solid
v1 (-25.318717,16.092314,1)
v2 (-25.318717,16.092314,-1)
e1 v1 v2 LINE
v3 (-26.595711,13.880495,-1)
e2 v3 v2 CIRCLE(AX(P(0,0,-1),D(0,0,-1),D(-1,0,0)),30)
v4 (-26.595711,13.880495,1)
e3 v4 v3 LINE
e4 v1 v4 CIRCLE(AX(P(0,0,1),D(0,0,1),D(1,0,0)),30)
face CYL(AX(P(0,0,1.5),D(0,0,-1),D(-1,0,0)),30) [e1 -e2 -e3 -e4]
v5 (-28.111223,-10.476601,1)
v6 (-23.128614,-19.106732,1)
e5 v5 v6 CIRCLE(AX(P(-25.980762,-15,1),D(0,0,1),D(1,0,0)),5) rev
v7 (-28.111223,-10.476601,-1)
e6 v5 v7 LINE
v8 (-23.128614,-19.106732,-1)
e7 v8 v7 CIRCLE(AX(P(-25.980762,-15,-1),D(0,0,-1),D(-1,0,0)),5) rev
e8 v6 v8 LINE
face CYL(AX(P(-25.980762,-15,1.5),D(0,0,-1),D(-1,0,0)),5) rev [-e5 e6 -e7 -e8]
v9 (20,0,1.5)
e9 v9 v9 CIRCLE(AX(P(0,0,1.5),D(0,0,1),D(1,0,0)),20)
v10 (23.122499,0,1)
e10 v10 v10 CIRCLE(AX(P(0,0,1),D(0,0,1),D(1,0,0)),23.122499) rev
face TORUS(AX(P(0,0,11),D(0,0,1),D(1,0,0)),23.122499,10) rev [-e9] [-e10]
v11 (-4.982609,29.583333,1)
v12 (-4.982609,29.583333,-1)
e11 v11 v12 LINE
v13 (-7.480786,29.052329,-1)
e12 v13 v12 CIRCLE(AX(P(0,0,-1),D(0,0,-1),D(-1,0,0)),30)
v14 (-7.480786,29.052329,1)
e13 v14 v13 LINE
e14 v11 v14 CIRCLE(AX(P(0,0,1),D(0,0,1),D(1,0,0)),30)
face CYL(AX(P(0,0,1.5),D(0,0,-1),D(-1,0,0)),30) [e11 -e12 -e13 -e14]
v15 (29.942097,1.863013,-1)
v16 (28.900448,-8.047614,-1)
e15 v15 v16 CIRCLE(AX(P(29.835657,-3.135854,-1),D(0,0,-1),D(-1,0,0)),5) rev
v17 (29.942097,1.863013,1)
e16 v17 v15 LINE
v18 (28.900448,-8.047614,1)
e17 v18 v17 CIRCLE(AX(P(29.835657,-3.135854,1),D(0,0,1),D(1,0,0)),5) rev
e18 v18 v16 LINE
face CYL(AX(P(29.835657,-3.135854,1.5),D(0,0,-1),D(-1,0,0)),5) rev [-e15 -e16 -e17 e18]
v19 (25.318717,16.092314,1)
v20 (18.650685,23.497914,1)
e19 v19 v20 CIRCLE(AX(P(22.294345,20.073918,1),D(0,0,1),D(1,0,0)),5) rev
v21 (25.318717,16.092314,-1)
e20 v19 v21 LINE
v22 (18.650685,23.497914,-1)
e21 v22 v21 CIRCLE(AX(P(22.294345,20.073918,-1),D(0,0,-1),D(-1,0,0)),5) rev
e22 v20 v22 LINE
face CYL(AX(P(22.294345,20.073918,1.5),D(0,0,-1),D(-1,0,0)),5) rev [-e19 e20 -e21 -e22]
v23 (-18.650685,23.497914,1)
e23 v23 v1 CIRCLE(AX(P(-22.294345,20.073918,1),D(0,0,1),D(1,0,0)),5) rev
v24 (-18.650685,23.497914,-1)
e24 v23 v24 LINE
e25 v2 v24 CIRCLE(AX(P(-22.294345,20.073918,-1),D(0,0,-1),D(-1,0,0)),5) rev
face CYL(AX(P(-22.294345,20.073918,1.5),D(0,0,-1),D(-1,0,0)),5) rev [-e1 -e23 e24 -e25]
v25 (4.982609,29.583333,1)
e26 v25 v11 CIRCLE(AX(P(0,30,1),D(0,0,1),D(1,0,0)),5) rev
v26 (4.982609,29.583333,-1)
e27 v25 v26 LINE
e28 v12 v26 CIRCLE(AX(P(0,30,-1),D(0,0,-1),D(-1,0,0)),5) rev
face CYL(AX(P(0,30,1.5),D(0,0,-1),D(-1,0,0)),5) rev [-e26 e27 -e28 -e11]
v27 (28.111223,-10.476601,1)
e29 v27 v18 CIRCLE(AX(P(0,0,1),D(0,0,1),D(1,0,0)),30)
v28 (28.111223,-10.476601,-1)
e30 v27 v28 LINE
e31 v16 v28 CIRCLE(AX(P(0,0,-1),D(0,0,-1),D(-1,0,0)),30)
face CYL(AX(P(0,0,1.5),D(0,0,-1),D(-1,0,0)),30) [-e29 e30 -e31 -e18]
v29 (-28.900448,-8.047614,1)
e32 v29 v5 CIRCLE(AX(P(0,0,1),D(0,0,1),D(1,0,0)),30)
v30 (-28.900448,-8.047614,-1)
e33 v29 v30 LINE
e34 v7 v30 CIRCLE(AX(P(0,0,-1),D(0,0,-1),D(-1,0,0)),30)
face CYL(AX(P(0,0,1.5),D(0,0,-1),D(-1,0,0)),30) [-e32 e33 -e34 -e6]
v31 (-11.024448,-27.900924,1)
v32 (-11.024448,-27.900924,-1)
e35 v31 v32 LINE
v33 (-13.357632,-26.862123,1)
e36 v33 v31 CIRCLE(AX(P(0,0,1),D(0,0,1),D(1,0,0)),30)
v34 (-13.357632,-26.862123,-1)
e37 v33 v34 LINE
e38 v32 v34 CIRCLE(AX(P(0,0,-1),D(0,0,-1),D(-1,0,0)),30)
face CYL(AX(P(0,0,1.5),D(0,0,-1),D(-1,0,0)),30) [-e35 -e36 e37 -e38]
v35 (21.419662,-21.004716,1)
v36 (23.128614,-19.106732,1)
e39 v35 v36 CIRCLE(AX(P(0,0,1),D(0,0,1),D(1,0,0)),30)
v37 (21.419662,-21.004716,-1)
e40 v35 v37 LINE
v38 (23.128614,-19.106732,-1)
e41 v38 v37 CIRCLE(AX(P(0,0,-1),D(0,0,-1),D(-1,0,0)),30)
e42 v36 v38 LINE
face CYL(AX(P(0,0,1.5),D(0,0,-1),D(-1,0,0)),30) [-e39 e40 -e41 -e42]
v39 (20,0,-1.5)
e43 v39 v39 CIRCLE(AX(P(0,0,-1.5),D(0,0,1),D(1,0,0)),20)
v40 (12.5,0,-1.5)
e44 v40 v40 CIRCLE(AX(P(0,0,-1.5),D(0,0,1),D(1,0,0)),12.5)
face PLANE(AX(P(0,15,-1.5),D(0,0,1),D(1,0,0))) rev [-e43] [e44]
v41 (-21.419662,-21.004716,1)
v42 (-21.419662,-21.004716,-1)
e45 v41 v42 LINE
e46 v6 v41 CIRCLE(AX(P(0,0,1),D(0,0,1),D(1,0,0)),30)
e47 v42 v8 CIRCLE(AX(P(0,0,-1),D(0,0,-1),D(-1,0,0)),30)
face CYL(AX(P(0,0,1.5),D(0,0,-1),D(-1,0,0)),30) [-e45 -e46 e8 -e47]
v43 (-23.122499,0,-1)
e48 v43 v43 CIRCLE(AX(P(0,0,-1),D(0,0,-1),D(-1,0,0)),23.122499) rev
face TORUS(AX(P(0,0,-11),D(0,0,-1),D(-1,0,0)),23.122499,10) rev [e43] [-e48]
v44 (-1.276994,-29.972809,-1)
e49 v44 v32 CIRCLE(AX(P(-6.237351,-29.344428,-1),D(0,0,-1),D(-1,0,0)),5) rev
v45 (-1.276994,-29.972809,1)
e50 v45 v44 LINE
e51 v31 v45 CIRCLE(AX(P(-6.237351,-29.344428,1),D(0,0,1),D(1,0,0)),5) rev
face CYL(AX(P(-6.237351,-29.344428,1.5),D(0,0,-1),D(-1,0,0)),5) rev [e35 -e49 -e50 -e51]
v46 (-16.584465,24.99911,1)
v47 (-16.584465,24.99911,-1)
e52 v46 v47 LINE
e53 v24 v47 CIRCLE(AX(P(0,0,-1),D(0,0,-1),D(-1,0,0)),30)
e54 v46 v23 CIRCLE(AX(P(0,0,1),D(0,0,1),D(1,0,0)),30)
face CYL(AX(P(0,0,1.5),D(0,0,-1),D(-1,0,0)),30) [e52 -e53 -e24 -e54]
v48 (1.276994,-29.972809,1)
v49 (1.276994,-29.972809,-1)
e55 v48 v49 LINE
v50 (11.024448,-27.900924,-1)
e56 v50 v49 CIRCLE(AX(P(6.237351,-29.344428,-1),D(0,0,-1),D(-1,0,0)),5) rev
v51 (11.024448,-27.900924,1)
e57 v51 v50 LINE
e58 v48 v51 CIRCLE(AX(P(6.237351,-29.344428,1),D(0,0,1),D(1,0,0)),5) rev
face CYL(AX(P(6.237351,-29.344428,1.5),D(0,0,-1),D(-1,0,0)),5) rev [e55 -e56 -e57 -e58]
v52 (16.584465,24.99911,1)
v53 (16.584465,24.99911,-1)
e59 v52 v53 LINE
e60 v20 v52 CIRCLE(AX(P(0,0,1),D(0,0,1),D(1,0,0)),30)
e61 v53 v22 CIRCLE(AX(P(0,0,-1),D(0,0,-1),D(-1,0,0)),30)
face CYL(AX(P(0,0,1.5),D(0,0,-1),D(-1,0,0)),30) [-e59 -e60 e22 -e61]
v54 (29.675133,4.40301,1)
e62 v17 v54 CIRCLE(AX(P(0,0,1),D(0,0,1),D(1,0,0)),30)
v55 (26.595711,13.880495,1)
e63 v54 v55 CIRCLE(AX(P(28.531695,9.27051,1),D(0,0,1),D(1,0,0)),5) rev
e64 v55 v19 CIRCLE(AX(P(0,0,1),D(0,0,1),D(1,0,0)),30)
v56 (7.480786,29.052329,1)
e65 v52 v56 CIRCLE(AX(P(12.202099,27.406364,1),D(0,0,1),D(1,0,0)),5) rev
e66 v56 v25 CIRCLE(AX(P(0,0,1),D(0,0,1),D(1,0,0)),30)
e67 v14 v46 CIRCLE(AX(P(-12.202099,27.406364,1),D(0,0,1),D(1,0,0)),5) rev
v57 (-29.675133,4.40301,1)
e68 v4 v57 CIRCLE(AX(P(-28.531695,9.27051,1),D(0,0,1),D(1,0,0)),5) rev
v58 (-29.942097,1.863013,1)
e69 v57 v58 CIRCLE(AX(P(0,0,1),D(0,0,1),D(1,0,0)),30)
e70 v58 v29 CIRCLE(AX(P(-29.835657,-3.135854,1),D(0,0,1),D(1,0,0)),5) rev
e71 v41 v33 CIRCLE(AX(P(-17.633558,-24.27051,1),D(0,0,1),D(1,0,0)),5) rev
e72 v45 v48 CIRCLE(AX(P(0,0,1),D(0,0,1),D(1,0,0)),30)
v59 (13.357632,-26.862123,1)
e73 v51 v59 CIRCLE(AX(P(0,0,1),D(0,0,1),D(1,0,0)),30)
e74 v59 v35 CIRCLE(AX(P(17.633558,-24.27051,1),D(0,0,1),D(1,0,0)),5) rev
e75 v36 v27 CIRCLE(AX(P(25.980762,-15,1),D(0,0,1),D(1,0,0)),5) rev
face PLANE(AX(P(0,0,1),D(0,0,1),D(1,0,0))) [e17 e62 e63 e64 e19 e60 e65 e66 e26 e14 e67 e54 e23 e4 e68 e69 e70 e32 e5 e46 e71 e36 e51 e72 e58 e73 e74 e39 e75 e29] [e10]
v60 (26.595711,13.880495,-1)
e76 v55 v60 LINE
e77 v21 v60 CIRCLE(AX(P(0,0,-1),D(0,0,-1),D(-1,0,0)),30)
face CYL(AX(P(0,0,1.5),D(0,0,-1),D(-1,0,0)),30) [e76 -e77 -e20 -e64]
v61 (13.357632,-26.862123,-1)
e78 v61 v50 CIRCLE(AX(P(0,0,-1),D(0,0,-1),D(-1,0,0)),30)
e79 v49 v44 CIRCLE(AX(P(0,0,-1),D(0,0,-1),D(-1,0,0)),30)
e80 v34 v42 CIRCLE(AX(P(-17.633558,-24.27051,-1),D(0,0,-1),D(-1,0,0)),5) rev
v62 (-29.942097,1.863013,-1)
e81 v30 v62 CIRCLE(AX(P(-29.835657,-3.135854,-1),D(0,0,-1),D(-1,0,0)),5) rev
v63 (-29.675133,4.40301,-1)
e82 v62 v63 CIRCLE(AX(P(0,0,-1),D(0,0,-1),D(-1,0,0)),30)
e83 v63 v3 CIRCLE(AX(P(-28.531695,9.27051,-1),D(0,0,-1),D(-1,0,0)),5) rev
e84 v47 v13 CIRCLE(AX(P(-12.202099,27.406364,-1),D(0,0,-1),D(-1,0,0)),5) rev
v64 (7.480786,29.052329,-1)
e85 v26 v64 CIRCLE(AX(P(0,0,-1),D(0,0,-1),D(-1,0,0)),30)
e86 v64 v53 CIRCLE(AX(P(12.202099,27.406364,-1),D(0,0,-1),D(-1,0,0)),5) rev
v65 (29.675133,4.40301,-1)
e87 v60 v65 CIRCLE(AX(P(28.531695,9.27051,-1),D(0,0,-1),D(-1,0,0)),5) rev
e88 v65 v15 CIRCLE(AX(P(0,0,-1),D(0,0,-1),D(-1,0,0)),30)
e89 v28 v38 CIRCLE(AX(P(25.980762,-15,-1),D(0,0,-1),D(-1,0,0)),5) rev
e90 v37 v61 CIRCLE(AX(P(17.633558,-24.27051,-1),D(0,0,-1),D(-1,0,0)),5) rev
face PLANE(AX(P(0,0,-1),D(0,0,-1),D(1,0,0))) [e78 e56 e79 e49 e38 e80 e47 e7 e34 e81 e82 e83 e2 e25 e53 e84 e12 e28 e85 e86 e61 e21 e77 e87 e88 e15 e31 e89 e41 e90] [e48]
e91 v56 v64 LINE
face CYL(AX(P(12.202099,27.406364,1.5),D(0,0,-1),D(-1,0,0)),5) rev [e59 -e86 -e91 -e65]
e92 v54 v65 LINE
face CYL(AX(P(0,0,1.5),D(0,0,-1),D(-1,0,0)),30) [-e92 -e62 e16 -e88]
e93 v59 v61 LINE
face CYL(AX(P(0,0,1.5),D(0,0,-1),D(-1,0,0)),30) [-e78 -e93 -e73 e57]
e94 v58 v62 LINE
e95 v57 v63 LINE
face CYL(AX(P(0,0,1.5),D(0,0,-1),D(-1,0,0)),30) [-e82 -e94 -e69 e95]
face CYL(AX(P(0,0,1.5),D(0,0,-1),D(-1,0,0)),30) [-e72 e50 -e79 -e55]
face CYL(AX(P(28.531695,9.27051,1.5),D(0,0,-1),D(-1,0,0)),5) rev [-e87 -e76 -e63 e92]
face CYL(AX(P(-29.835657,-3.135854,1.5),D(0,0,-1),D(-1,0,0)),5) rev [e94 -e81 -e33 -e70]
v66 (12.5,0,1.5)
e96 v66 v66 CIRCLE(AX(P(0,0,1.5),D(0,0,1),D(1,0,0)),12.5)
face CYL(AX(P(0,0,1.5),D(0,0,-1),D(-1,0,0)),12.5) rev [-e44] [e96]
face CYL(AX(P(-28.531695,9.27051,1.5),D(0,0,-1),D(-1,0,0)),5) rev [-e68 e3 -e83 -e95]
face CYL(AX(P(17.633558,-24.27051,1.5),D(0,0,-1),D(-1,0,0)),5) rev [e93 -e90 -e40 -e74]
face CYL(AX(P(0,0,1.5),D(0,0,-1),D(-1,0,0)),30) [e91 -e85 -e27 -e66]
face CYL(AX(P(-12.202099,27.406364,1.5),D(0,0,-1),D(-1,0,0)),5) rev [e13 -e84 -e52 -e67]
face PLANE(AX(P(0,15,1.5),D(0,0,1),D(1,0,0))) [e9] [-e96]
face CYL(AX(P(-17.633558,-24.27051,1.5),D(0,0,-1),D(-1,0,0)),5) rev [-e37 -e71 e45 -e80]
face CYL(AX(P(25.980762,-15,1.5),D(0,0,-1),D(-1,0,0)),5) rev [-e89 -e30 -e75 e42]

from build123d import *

# Parameters (mm, degrees)
SKETCH1_R            = 12.5
BOSS_EXTRUDE1_DEPTH  = 1.5
SKETCH2_R            = 40
SKETCH2_R_2          = 20
CUT_EXTRUDE1_DEPTH   = 0.5
FILLET1_R            = 10
FILLET1_OF_MIRROR1_R = 10


with BuildPart() as part:
    # Sketch1 → Boss-Extrude1 (new, symmetric)
    with BuildSketch(Plane.XY):
        with BuildLine():
            ThreePointArc((-4.982608643, 29.583333333), (-6.237350725, 29.344428022), (-7.480786198, 29.052329302))
            ThreePointArc((-7.480786198, 29.052329302), (-10.168416077, 22.838636441), (-16.584465184, 24.999110275))
            ThreePointArc((-16.584465184, 24.999110275), (-17.633557569, 24.270509831), (-18.650685145, 23.497913602))
            ThreePointArc((-18.650685145, 23.497913602), (-18.578620637, 16.728265159), (-25.31871703, 16.092313941))
            ThreePointArc((-25.31871703, 16.092313941), (-25.980762114, 15), (-26.595711193, 13.880495168))
            ThreePointArc((-26.595711193, 13.880495168), (-23.776412907, 7.725424859), (-29.675132687, 4.403010332))
            ThreePointArc((-29.675132687, 4.403010332), (-29.835656861, 3.135853898), (-29.942097162, 1.86301302))
            ThreePointArc((-29.942097162, 1.86301302), (-24.863047384, -2.613211582), (-28.900448313, -8.047613763))
            ThreePointArc((-28.900448313, -8.047613763), (-28.531695489, -9.270509831), (-28.111222517, -10.476601005))
            ThreePointArc((-28.111222517, -10.476601005), (-21.650635095, -12.5), (-23.128613874, -19.106732329))
            ThreePointArc((-23.128613874, -19.106732329), (-22.294344764, -20.073918191), (-21.419662115, -21.004715539))
            ThreePointArc((-21.419662115, -21.004715539), (-14.694631307, -20.225424859), (-13.357631979, -26.862123295))
            ThreePointArc((-13.357631979, -26.862123295), (-12.202099292, -27.406363729), (-11.024447543, -27.900923934))
            ThreePointArc((-11.024447543, -27.900923934), (-5.19779227, -24.453690018), (-1.276994164, -29.972809109))
            ThreePointArc((-1.276994164, -29.972809109), (0, -30), (1.276994164, -29.972809109))
            ThreePointArc((1.276994164, -29.972809109), (5.19779227, -24.453690018), (11.024447543, -27.900923934))
            ThreePointArc((11.024447543, -27.900923934), (12.202099292, -27.406363729), (13.357631979, -26.862123295))
            ThreePointArc((13.357631979, -26.862123295), (14.694631307, -20.225424859), (21.419662115, -21.004715539))
            ThreePointArc((21.419662115, -21.004715539), (22.294344764, -20.073918191), (23.128613874, -19.106732329))
            ThreePointArc((23.128613874, -19.106732329), (21.650635095, -12.5), (28.111222517, -10.476601005))
            ThreePointArc((28.111222517, -10.476601005), (28.531695489, -9.270509831), (28.900448313, -8.047613763))
            ThreePointArc((28.900448313, -8.047613763), (24.863047384, -2.613211582), (29.942097162, 1.86301302))
            ThreePointArc((29.942097162, 1.86301302), (29.835656861, 3.135853898), (29.675132687, 4.403010332))
            ThreePointArc((29.675132687, 4.403010332), (23.776412907, 7.725424859), (26.595711193, 13.880495168))
            ThreePointArc((26.595711193, 13.880495168), (25.980762114, 15), (25.31871703, 16.092313941))
            ThreePointArc((25.31871703, 16.092313941), (18.578620637, 16.728265159), (18.650685145, 23.497913602))
            ThreePointArc((18.650685145, 23.497913602), (17.633557569, 24.270509831), (16.584465184, 24.999110275))
            ThreePointArc((16.584465184, 24.999110275), (10.168416077, 22.838636441), (7.480786198, 29.052329302))
            ThreePointArc((7.480786198, 29.052329302), (6.237350725, 29.344428022), (4.982608643, 29.583333333))
            ThreePointArc((4.982608643, 29.583333333), (0, 25), (-4.982608643, 29.583333333))
        make_face()
        Circle(SKETCH1_R, mode=Mode.SUBTRACT)
    extrude(amount=BOSS_EXTRUDE1_DEPTH, both=True)

    # Sketch2 → Cut-Extrude1 (cut)
    with BuildSketch(Plane.XY.offset(1.5)):
        Circle(SKETCH2_R)
        Circle(SKETCH2_R_2, mode=Mode.SUBTRACT)
    cut_extrude1 = extrude(amount=-CUT_EXTRUDE1_DEPTH, mode=Mode.SUBTRACT)

    # Fillet1
    # the kernel refuses this fillet: 10 mm, written as the material it adds along each edge
    with BuildSketch(Plane(origin=(0, 0, 1), x_dir=(1, 0, 0), z_dir=(0, -1, 0))) as fillet1_piece_1:
        with BuildLine():
            CenterArc((23.122498999, 10), FILLET1_R, 251.805127661, 18.194872339)
            Line((20, 0.5), (19.93755002, 0.31))
            ThreePointArc((19.93755002, 0.31), (19.8, 0.25), (19.8, 0))
            Line((19.8, 0), (20, -0.2))
            Line((20, -0.2), (23.122498999, -0.2))
            Line((23.122498999, -0.2), (23.122498999, 0))
        make_face()
    revolve(axis=Axis((0, 0, 1), (0, 0, 1)))

    # Mirror1: Cut-Extrude1 across plane
    add(cut_extrude1.mirror(Plane.XY), mode=Mode.SUBTRACT)

    # Fillet1 of Mirror1
    # the kernel refuses this fillet: 10 mm, written as the material it adds along each edge
    with BuildSketch(Plane(origin=(0, 0, -1), x_dir=(1, 0, 0), z_dir=(0, -1, 0))) as fillet1_of_mirror1_piece_1:
        with BuildLine():
            CenterArc((23.122498999, -10), FILLET1_OF_MIRROR1_R, 90, 18.194872339)
            Line((20, -0.5), (19.93755002, -0.31))
            ThreePointArc((19.93755002, -0.31), (19.8, -0.25), (19.8, 0))
            Line((19.8, 0), (20, 0.2))
            Line((20, 0.2), (23.122498999, 0.2))
            Line((23.122498999, 0.2), (23.122498999, 0))
        make_face()
    revolve(axis=Axis((0, 0, -1), (0, 0, 1)))


solid = part.part
